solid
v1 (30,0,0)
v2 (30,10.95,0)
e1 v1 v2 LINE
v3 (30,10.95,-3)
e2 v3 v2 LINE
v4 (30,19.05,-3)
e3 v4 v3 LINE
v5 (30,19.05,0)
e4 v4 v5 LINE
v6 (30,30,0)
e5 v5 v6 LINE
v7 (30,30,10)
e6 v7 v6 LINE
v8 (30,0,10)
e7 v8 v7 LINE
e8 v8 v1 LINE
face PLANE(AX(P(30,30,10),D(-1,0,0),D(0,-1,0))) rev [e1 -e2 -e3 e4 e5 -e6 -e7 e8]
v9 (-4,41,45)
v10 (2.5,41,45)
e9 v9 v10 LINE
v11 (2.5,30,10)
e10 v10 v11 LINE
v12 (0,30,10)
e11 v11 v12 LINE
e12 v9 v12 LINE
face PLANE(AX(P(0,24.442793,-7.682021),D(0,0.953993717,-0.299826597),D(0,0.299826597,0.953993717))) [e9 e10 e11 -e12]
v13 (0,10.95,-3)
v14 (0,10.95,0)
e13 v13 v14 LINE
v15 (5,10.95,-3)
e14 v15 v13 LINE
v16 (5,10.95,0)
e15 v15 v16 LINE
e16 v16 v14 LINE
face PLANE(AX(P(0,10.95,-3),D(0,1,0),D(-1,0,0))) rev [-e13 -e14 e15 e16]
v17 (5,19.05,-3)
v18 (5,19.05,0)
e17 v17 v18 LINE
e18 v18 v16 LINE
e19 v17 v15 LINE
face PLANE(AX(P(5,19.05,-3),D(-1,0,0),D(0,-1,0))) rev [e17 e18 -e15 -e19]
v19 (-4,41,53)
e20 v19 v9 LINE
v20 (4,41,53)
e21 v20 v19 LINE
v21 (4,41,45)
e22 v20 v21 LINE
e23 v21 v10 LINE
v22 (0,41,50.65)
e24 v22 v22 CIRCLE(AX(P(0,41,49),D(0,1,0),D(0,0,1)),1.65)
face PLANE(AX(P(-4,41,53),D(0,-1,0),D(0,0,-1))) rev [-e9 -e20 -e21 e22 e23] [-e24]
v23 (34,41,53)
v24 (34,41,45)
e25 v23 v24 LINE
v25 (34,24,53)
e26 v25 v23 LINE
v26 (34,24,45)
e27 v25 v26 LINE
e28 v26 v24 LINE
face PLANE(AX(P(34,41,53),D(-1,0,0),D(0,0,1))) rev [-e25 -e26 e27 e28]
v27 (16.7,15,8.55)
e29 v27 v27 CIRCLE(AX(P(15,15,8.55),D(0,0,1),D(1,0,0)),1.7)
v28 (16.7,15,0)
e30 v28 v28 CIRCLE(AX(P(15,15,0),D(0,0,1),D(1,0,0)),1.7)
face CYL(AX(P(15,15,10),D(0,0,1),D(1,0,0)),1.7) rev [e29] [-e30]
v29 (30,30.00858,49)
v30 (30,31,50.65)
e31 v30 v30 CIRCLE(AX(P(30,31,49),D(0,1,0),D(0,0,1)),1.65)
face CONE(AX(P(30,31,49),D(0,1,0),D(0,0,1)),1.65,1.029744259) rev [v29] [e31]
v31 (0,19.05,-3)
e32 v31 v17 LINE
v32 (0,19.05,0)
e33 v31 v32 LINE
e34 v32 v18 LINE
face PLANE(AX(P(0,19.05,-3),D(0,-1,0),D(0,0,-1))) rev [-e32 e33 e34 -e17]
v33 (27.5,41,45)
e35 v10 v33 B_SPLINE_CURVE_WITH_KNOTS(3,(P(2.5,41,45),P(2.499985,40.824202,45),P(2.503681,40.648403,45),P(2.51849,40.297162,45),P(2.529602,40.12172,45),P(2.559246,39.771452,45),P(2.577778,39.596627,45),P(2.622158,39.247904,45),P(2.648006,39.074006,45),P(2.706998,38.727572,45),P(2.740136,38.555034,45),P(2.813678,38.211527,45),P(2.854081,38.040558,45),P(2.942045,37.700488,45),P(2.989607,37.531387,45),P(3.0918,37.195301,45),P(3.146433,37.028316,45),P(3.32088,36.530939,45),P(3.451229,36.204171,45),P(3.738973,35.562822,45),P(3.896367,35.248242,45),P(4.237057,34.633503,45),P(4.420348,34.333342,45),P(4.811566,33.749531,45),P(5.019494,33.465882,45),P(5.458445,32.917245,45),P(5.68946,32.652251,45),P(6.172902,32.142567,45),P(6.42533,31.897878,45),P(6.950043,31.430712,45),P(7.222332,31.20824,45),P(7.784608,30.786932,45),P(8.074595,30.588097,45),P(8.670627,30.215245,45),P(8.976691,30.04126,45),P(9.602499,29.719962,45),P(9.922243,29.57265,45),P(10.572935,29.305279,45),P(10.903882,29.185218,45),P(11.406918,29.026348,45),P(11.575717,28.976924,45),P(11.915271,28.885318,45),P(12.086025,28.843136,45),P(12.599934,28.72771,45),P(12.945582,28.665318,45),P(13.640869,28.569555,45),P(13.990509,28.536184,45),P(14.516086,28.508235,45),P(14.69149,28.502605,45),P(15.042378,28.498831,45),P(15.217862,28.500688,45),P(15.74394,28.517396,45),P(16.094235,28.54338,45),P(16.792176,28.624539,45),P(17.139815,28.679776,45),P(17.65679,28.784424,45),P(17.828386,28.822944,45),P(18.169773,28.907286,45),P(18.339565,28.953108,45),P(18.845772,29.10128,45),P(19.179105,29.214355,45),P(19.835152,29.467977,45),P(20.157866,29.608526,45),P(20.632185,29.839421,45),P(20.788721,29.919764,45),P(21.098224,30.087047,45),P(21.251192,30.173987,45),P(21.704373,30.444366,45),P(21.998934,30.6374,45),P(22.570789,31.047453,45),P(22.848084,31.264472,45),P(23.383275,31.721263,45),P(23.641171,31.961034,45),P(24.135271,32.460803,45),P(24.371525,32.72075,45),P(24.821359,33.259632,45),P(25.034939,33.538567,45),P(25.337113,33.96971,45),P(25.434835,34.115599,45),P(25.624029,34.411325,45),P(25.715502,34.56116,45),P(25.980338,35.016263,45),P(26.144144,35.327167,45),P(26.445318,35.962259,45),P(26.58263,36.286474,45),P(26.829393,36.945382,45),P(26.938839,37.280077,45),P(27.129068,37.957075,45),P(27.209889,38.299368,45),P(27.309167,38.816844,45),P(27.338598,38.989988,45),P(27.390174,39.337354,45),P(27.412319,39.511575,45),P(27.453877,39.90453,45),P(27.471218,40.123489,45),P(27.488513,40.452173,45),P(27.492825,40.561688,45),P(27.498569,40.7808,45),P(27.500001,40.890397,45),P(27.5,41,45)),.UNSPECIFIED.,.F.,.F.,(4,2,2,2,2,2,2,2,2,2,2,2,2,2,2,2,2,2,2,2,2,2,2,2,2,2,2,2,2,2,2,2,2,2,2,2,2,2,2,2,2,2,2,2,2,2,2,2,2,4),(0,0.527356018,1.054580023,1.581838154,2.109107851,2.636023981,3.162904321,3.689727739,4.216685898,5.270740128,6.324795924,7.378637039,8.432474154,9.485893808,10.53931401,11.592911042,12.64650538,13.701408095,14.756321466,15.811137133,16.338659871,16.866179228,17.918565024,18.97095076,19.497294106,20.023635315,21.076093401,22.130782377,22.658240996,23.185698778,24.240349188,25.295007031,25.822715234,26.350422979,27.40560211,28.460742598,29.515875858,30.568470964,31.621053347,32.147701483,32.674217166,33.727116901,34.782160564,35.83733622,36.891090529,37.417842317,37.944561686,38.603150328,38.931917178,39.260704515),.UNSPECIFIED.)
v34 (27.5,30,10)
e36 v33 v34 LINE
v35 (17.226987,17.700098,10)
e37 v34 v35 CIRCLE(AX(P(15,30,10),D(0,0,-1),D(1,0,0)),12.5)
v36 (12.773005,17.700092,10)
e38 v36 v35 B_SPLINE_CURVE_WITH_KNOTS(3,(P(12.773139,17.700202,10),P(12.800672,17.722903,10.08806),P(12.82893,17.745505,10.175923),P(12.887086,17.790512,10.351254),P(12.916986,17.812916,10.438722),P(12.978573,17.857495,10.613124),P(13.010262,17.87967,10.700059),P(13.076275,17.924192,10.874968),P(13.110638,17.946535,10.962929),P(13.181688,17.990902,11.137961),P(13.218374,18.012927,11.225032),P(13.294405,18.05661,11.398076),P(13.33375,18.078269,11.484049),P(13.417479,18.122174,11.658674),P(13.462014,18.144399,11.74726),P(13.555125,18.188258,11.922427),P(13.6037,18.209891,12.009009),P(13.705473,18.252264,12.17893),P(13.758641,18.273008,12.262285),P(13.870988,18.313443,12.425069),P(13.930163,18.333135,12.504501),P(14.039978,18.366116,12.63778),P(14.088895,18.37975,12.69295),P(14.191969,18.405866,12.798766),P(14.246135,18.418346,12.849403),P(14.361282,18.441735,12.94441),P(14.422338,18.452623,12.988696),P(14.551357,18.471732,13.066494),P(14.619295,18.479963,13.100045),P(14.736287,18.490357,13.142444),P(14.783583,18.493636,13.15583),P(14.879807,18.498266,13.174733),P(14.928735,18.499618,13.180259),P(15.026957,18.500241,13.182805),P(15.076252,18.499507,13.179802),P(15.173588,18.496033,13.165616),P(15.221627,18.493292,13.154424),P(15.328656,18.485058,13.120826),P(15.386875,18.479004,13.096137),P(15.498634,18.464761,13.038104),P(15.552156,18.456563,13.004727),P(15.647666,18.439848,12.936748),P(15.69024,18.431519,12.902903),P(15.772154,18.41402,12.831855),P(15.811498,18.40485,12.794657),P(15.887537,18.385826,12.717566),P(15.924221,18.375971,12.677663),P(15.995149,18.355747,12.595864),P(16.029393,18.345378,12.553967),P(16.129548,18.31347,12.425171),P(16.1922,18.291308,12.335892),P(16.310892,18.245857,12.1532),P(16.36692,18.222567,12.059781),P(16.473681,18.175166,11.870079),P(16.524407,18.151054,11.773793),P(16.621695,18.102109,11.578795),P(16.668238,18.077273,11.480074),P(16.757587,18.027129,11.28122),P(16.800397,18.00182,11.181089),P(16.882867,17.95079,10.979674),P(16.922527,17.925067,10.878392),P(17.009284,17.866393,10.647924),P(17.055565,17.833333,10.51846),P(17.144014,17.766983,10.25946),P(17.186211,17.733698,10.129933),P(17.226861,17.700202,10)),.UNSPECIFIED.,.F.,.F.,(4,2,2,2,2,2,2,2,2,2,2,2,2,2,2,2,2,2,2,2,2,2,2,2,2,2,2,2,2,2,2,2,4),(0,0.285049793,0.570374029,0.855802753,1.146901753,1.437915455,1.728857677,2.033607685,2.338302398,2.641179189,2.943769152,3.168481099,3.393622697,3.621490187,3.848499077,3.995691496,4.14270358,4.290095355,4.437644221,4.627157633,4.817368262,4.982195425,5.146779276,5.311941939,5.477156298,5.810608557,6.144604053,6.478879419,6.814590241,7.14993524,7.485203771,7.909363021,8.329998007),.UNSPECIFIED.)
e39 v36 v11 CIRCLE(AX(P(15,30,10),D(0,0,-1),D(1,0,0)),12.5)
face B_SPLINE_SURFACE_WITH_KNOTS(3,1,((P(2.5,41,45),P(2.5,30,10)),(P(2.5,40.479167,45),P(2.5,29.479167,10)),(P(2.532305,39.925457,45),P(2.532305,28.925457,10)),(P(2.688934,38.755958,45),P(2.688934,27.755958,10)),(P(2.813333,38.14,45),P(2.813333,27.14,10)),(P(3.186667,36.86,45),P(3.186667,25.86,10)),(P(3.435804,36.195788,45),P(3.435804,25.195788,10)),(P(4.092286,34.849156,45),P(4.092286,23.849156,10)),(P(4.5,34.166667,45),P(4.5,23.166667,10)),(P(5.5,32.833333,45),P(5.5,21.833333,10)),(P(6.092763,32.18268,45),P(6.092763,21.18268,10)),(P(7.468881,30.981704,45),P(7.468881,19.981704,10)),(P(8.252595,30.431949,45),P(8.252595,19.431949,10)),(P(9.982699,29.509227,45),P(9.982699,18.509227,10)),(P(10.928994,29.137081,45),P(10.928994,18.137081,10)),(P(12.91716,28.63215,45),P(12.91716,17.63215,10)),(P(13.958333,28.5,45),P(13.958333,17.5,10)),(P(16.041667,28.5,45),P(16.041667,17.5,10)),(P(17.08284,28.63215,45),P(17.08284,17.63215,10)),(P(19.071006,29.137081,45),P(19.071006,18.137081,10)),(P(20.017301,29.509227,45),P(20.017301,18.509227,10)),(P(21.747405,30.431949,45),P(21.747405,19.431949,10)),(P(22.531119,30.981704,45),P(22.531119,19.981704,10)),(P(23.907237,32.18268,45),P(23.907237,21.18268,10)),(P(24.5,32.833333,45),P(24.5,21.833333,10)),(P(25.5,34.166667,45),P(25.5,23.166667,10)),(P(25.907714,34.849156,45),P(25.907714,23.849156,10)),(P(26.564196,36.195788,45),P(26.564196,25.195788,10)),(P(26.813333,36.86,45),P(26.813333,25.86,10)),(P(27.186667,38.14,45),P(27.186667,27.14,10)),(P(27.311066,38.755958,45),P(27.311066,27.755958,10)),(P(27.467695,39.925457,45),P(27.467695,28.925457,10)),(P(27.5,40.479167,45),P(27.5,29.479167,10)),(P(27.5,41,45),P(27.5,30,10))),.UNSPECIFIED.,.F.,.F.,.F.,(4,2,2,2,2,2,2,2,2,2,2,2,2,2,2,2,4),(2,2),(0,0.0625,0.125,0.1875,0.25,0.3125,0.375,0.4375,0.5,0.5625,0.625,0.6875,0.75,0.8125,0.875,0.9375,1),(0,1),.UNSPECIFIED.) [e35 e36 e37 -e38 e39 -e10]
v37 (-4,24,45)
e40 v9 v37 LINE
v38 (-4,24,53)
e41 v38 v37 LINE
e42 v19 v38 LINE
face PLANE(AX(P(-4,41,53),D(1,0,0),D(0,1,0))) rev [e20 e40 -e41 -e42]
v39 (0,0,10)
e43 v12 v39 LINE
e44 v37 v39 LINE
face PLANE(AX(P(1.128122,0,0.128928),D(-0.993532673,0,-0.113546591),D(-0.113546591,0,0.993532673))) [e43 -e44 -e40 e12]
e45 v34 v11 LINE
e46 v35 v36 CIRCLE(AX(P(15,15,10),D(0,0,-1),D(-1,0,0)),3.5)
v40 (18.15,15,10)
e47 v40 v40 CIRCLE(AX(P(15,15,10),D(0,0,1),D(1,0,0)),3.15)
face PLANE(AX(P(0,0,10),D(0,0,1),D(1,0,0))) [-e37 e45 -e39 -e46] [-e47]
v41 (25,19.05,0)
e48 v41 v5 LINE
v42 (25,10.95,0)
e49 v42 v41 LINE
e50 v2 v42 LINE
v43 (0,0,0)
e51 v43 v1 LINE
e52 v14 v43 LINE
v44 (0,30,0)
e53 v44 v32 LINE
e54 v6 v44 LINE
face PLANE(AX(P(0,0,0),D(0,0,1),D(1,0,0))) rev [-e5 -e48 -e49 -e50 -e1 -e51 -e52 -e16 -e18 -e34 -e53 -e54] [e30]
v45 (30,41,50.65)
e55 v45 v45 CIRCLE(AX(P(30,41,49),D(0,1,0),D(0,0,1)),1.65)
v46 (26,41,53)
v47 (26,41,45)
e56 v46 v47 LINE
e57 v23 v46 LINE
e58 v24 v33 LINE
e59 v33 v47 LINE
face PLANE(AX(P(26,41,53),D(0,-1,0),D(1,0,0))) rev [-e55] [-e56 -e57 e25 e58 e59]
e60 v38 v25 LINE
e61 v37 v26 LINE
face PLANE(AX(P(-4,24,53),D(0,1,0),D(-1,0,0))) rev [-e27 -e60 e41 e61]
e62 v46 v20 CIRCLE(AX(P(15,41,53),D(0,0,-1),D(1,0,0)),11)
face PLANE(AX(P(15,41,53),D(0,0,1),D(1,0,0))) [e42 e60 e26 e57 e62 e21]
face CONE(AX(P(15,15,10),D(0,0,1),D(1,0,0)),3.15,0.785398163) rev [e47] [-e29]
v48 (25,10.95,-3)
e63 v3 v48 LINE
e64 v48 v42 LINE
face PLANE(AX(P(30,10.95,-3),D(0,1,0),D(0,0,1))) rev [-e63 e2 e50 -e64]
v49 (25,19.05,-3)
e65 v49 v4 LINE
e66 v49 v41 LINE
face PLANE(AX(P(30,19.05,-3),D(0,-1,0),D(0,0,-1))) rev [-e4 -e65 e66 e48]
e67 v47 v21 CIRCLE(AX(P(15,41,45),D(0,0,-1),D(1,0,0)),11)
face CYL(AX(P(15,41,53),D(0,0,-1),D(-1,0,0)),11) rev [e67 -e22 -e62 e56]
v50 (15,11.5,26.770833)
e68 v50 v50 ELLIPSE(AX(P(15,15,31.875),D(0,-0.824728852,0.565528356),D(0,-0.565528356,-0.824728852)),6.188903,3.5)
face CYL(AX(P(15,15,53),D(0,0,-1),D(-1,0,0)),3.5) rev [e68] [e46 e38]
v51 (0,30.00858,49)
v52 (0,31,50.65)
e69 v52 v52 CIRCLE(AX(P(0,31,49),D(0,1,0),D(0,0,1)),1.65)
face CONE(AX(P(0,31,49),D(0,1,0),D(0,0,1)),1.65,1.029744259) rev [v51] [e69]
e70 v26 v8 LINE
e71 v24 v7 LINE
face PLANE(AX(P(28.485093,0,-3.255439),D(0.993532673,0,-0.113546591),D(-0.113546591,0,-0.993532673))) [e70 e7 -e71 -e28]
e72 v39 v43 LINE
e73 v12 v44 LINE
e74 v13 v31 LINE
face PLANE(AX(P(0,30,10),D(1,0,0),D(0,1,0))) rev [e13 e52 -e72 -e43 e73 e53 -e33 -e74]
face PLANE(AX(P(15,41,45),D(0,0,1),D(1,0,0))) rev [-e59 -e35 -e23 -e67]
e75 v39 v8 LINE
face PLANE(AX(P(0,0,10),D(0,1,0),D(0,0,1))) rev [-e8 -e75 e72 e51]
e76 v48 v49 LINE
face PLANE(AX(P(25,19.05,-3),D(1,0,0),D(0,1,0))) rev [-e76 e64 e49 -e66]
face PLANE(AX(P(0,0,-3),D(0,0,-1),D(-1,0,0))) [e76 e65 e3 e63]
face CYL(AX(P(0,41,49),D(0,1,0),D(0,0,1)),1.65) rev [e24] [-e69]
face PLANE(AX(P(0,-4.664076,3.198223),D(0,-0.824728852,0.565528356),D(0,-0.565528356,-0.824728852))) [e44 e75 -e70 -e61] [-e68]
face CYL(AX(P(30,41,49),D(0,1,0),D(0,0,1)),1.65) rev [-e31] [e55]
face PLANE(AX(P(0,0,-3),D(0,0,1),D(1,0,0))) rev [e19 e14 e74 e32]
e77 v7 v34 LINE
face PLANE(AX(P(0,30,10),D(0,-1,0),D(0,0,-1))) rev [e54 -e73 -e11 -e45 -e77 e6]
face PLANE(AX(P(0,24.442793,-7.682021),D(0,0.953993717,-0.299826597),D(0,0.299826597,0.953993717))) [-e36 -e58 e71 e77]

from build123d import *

# Parameters (mm, degrees)
SKETCH_1_W          = 30
SKETCH_1_H          = 30
EXTRUDE_1_DEPTH     = 10
EXTRUDE_3_DEPTH     = 8
SKETCH_11_R         = 3.5
CUT_EXTRUDE_2_DEPTH = 69.45436447
SKETCH_12_W         = 5
SKETCH_12_H         = 8.1
EXTRUDE_4_DEPTH     = 3


with BuildPart() as part:
    # 草图1 → 凸台-拉伸1 (new body)
    with BuildSketch(Plane.XY):
        with Locations((15, 15)):
            Rectangle(SKETCH_1_W, SKETCH_1_H)
    extrude(amount=EXTRUDE_1_DEPTH)

    # 高级异型孔1: read off the stored shape, not the designer's step
    # 高级异型孔1 outline → 高级异型孔1 (revolve, cut)
    with BuildSketch(Plane(origin=(15, 15, 0), x_dir=(1, 0, 0), z_dir=(0, -1, 0))):
        Polygon((3.15, 10), (0, 10), (0, 0), (1.7, 0), (1.7, 8.55), align=None)
    revolve(axis=Axis((15, 15, 0), (0, 0, 1)), mode=Mode.SUBTRACT)



with BuildPart() as body_2:
    # 草图2 → 凸台-拉伸3 (new body)
    with BuildSketch(Plane.XY.offset(45)):
        with BuildLine():
            Line((-4, 41), (4, 41))
            ThreePointArc((4, 41), (15, 30), (26, 41))
            Line((26, 41), (34, 41))
            Line((34, 41), (34, 24))
            Line((34, 24), (-4, 24))
            Line((-4, 24), (-4, 41))
        make_face()
    extrude(amount=EXTRUDE_3_DEPTH)


with BuildPart() as part_1:
    add(part.part)

    add(body_2.part)  # 放样2 merges body 2
    # 草图3 → 放样2 section 0
    with BuildSketch(Plane(origin=(0, 0, 45), x_dir=(-1, 0, 0), z_dir=(0, 0, -1))):
        with BuildLine():
            Line((-34, 41), (-27.5, 41))
            ThreePointArc((-27.5, 41), (-15, 28.5), (-2.5, 41))
            Line((-2.5, 41), (4, 41))
            Line((4, 41), (4, 24))
            Line((4, 24), (-34, 24))
            Line((-34, 24), (-34, 41))
        make_face()
    # 草图5 → 放样2 section 1
    with BuildSketch(Plane.XY.offset(10)):
        with BuildLine():
            Line((27.5, 30), (30, 30))
            Line((30, 30), (30, 0))
            Line((30, 0), (0, 0))
            Line((0, 0), (0, 30))
            Line((0, 30), (2.5, 30))
            ThreePointArc((2.5, 30), (15, 17.5), (27.5, 30))
        make_face()
    loft()

    # 草图11 → 切除-拉伸2 (cut, through all)
    with BuildSketch(Plane(origin=(0, 0, 10), x_dir=(-1, 0, 0), z_dir=(0, 0, -1))):
        with Locations(Location((-15, 15, 0), (0, 0, 50.487533502))):
            Circle(SKETCH_11_R)
    extrude(amount=-CUT_EXTRUDE_2_DEPTH, mode=Mode.SUBTRACT)

    # 草图12 → 凸台-拉伸4 (add)
    with BuildSketch(Plane(origin=(0, 0, 0), x_dir=(-1, 0, 0), z_dir=(0, 0, -1))):
        with Locations((-27.5, 15)):
            Rectangle(SKETCH_12_W, SKETCH_12_H)
        with Locations((-2.5, 15)):
            Rectangle(SKETCH_12_W, SKETCH_12_H)
    extrude(amount=EXTRUDE_4_DEPTH)

    # 高级异型孔4: read off the stored shape, not the designer's step
    # 高级异型孔4 outline → 高级异型孔4 (revolve, cut)
    with BuildSketch(Plane(origin=(30, 0, 49), x_dir=(1, 0, 0), z_dir=(0, 0, 1))):
        Polygon((0, 30.008579979), (1.65, 31), (1.65, 41), (0, 41), align=None)
    revolve(axis=Axis((30, 0, 49), (0, 1, 0)), mode=Mode.SUBTRACT)

    # Other 4 2 outline → Other 4 2 (revolve, cut)
    with BuildSketch(Plane.XY.offset(49)):
        Polygon((0, 30.008579979), (1.65, 31), (1.65, 41), (0, 41), align=None)
    revolve(axis=Axis((0, 0, 49), (0, 1, 0)), mode=Mode.SUBTRACT)


solid = part_1.part
